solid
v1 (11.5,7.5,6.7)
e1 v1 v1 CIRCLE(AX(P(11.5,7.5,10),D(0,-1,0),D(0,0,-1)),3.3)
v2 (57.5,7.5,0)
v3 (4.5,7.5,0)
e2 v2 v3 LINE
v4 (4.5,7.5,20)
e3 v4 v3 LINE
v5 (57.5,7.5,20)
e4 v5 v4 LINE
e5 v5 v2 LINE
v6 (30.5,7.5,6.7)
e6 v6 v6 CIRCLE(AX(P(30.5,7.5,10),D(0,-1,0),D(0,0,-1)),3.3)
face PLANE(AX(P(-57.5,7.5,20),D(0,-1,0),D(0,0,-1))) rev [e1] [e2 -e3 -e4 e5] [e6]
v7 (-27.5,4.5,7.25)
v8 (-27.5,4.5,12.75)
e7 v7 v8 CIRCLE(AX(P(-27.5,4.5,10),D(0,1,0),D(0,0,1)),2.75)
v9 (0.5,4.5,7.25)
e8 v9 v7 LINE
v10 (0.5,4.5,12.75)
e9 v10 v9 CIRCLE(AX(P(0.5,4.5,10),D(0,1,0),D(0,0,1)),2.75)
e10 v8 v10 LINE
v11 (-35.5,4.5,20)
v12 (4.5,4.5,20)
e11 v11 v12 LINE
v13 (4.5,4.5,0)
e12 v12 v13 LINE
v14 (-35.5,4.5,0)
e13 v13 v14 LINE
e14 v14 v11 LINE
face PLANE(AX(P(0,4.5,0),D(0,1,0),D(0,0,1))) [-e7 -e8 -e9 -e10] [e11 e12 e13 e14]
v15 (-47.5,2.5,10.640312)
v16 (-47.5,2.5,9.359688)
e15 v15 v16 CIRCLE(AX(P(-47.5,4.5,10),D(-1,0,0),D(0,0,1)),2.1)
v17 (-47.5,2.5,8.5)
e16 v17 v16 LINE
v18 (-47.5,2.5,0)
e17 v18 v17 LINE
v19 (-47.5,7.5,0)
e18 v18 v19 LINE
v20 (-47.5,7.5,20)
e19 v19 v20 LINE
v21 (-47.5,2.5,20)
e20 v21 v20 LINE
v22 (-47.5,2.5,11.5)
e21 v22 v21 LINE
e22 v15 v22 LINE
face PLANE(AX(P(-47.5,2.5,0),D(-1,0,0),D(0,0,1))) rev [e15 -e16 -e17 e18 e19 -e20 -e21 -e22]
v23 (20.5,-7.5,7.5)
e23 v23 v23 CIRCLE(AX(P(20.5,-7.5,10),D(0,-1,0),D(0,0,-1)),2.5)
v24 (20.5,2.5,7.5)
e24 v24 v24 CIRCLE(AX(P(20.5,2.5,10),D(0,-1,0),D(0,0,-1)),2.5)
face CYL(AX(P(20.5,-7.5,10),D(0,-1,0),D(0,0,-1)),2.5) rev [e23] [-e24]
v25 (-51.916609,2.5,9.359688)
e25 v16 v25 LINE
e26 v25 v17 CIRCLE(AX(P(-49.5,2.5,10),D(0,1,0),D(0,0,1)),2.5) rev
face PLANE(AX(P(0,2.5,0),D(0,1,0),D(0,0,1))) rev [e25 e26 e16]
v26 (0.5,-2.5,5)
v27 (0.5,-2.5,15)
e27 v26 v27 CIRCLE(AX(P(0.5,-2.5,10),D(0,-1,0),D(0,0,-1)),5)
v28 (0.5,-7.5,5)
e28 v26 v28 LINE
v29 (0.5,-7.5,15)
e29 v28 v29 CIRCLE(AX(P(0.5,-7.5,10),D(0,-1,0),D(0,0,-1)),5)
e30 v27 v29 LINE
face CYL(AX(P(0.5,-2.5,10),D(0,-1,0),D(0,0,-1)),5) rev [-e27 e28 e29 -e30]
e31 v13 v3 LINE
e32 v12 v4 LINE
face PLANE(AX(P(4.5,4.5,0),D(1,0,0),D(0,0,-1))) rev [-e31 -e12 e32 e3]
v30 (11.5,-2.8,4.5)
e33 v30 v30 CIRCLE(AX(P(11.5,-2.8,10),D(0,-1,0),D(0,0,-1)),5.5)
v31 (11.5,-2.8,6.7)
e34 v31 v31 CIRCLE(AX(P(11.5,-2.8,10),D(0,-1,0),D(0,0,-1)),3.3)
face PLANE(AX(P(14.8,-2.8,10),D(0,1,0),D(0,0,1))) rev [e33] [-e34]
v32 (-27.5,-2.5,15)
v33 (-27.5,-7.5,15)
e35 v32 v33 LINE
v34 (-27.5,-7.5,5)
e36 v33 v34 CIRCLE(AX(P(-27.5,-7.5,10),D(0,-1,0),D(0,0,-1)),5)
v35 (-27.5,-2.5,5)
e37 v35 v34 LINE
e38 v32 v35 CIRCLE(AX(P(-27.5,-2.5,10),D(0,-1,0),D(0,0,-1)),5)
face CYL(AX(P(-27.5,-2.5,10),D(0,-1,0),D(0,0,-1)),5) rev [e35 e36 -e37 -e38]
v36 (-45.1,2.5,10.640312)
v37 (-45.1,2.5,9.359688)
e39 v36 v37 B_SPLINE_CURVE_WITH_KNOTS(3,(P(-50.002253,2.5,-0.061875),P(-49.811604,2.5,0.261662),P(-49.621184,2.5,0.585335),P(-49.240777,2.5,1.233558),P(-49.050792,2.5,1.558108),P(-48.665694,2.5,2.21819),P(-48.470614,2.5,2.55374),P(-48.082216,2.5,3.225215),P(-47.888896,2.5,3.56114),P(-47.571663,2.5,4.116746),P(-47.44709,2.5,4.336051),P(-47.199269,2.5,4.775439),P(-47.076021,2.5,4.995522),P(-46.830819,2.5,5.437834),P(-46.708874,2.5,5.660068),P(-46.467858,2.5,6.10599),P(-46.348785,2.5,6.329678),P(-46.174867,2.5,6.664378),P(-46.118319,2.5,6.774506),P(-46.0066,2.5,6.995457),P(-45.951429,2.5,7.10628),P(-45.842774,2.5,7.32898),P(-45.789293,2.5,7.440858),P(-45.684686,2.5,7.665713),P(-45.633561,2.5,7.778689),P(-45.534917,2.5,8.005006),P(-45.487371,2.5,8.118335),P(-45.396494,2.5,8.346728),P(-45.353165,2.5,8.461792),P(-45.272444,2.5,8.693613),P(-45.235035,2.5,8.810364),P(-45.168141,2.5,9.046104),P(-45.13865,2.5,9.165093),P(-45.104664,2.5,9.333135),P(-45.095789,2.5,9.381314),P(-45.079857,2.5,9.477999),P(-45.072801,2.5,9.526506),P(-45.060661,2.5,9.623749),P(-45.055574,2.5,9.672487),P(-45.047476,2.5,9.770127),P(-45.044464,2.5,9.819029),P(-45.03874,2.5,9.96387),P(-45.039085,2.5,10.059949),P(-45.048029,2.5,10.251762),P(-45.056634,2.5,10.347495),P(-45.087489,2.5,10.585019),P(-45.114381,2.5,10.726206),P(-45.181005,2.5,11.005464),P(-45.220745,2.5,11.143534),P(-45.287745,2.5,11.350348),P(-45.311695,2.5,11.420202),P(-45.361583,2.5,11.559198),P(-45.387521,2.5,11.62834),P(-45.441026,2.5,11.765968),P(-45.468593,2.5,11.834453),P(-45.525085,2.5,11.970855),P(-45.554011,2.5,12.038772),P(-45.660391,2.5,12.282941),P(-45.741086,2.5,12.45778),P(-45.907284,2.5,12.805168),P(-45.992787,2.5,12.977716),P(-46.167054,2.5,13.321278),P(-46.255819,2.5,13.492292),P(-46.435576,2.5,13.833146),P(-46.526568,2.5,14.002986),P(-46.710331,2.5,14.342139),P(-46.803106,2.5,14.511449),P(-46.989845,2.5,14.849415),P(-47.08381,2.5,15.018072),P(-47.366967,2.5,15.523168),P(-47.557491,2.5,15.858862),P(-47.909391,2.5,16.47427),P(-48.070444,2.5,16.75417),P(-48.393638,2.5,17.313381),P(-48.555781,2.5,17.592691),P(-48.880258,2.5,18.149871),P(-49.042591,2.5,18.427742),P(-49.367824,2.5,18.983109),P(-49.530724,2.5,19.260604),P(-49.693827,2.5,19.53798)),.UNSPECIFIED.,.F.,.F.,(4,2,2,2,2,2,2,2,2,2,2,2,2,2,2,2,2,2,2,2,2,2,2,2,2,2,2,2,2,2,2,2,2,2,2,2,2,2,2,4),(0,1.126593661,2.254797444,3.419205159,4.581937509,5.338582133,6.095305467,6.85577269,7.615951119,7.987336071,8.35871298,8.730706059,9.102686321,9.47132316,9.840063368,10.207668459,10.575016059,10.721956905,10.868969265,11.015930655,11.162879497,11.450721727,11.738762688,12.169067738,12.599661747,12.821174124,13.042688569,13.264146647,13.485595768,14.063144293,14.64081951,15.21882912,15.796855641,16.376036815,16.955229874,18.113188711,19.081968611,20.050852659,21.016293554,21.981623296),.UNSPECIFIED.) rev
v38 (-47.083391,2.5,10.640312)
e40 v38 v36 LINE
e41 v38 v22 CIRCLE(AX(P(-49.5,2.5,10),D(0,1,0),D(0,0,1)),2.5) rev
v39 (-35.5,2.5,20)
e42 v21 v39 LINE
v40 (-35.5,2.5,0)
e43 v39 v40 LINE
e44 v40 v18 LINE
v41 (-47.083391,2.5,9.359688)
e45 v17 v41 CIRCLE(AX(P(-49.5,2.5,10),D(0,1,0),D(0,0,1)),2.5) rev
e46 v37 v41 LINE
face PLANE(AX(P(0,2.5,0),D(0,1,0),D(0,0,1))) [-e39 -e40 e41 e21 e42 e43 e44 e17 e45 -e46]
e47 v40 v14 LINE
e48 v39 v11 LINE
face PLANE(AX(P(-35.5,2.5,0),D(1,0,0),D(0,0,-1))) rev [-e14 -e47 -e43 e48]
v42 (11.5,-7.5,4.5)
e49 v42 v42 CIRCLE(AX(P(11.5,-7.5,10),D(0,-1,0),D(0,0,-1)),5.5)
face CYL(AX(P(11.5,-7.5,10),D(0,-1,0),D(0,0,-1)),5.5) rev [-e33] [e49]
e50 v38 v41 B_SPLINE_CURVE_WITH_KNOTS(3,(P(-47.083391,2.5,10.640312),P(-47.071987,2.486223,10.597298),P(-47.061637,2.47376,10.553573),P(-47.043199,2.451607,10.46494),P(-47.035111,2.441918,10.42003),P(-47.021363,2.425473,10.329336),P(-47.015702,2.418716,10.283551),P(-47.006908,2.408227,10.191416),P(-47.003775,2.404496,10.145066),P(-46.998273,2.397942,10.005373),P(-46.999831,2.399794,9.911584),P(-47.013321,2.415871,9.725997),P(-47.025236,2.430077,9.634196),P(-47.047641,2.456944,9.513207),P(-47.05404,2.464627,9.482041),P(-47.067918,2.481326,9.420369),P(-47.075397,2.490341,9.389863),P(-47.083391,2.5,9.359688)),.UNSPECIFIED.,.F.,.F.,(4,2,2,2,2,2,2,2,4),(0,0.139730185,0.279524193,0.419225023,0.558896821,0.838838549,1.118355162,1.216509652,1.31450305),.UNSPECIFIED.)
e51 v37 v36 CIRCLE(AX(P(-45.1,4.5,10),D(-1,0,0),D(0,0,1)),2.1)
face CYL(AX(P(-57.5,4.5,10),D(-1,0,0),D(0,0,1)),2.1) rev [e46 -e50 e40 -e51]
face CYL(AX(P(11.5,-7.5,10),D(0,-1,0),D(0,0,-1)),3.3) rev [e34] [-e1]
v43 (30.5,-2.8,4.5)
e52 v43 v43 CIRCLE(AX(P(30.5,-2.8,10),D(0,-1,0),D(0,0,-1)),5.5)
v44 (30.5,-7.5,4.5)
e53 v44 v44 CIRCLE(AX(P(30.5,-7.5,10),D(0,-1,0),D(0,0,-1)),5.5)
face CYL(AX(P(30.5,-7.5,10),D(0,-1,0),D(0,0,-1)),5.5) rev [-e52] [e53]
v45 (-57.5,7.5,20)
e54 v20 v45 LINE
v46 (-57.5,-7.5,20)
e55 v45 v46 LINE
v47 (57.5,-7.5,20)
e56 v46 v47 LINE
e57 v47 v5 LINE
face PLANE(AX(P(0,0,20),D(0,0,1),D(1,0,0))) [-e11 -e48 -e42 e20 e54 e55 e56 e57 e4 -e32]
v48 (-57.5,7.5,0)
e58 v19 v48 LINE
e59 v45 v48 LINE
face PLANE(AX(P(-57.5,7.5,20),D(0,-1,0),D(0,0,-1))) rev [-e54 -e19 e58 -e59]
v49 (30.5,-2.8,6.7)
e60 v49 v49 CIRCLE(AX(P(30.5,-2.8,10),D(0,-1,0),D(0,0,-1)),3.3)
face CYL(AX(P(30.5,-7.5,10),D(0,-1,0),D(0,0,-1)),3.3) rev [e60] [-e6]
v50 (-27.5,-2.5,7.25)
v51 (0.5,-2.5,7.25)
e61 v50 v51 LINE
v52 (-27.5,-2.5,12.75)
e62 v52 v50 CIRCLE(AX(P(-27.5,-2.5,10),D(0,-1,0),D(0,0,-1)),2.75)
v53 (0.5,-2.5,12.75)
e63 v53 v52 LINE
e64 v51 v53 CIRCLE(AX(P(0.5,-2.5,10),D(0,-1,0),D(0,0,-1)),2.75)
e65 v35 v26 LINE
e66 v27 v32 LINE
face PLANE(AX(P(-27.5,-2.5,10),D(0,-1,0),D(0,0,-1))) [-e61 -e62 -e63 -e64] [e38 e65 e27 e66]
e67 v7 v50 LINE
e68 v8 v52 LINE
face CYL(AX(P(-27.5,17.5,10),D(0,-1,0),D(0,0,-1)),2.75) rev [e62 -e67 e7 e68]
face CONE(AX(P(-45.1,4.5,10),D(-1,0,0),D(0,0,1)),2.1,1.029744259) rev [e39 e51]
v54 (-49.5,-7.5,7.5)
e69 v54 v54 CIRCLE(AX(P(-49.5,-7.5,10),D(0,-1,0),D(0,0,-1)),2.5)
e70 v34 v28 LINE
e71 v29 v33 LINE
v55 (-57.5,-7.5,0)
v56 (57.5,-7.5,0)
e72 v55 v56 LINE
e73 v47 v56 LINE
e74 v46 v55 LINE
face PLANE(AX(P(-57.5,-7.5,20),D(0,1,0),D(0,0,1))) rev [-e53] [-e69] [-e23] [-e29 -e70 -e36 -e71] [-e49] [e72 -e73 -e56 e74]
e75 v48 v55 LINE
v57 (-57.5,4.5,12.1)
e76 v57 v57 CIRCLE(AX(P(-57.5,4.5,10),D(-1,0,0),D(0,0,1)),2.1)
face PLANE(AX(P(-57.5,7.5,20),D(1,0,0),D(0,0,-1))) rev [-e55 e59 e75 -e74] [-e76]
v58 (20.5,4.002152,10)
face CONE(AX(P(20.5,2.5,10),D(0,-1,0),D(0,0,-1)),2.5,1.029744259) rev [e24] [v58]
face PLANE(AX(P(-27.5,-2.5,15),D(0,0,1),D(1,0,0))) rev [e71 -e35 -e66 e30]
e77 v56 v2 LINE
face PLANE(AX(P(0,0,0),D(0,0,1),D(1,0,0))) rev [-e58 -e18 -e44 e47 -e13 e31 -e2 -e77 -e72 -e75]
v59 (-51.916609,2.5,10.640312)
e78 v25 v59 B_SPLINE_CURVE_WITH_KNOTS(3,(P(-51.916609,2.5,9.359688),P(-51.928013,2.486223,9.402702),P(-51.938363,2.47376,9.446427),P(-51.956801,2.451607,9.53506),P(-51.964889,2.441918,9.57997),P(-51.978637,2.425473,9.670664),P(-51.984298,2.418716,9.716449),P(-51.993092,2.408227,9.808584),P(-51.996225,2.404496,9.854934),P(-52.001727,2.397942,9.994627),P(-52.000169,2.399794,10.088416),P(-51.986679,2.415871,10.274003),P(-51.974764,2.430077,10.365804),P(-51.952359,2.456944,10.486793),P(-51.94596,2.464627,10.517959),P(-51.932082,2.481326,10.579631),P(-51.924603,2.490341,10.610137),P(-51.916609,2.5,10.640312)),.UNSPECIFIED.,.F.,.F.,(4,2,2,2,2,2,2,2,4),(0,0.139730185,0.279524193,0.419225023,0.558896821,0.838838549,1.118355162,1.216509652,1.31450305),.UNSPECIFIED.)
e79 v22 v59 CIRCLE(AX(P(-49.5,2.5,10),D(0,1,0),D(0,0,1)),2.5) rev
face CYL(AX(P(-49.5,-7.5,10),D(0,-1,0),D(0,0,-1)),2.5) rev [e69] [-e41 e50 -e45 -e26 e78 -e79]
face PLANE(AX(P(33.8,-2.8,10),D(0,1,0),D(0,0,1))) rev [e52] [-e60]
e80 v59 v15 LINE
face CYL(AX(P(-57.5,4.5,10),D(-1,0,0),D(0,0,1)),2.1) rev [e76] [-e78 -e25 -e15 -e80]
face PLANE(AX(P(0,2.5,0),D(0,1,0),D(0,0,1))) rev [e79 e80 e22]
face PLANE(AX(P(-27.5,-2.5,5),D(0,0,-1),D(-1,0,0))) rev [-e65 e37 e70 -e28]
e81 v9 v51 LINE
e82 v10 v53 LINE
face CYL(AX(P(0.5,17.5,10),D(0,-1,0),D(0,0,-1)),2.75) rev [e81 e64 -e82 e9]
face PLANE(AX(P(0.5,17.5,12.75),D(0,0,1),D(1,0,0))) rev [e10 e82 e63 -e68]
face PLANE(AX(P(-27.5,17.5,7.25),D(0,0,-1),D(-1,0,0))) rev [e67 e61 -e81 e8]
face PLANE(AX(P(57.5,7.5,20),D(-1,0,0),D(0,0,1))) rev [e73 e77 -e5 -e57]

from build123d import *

# Parameters (mm, degrees)
SKETCH_1_W                 = 115
SKETCH_1_H                 = 15
EXTRUDE_1_DEPTH            = 20
SKETCH_2_W                 = 12
SKETCH_2_H                 = 20
CUT_EXTRUDE_1_DEPTH        = 5
SKETCH_3_W                 = 40
SKETCH_3_H                 = 20
CUT_EXTRUDE_2_DEPTH        = 3
HOLE_START                 = -7.5
HOLE_WIZARD_M6_1_OUTLINE_R = 2.5
HOLE_WIZARD_M6_1_DEPTH     = 10
CUT_EXTRUDE_3_DEPTH        = 5
CUT_EXTRUDE_4_DEPTH        = 20
HOLE_WIZARD_3_D            = 6.6
HOLE_WIZARD_3_DEPTH        = 15
HOLE_WIZARD_3_CBORE_D      = 11
HOLE_WIZARD_3_CBORE_DEPTH  = 4.7
HOLE_WIZARD_3_TIP          = 1.982840043
HOLE_WIZARD_M5_1_D         = 4.2
HOLE_WIZARD_M5_1_DEPTH     = 12.4
HOLE_WIZARD_M5_1_TIP       = 1.2618073


# Read off the part's stored shape, not the designer's step: M6 螺纹孔1
with BuildPart() as part:
    # 草图1 → 凸台-拉伸1 (new body)
    with BuildSketch(Plane.XY):
        Rectangle(SKETCH_1_W, SKETCH_1_H)
    extrude(amount=EXTRUDE_1_DEPTH)

    # 草图2 → 切除-拉伸1 (cut)
    with BuildSketch(Plane(origin=(0, 7.5, 0), x_dir=(1, 0, 0), z_dir=(0, 1, 0))):
        with Locations((-41.5, -10)):
            Rectangle(SKETCH_2_W, SKETCH_2_H)
    extrude(amount=-CUT_EXTRUDE_1_DEPTH, mode=Mode.SUBTRACT)

    # 草图3 → 切除-拉伸2 (cut)
    with BuildSketch(Plane(origin=(0, 7.5, 0), x_dir=(1, 0, 0), z_dir=(0, 1, 0))):
        with Locations((-15.5, -10)):
            Rectangle(SKETCH_3_W, SKETCH_3_H)
    extrude(amount=-CUT_EXTRUDE_2_DEPTH, mode=Mode.SUBTRACT)

    # M6 螺纹孔1 outline → M6 螺纹孔1 (cut)
    with BuildSketch(Plane(origin=(0, 0, 0), x_dir=(1, 0, 0), z_dir=(0, 1, 0)).offset(HOLE_START)):
        with Locations((-49.5, -10)):
            Circle(HOLE_WIZARD_M6_1_OUTLINE_R)
    extrude(amount=HOLE_WIZARD_M6_1_DEPTH, mode=Mode.SUBTRACT)

    # Hole Wizard M6 _1 2 outline → Hole Wizard M6 _1 2 (revolve, cut)
    with BuildSketch(Plane(origin=(20.5, 0, 10), x_dir=(1, 0, 0), z_dir=(0, 0, 1))):
        Polygon((2.5, 2.5), (0, 4.002151548), (0, -7.5), (2.5, -7.5), align=None)
    revolve(axis=Axis((20.5, 0, 10), (0, 1, 0)), mode=Mode.SUBTRACT)

    # 草图6 → 切除-拉伸3 (cut)
    with BuildSketch(Plane.XZ.offset(7.5)):
        with BuildLine():
            Line((-27.5, 15), (0.5, 15))
            ThreePointArc((0.5, 15), (5.5, 10), (0.5, 5))
            Line((0.5, 5), (-27.5, 5))
            ThreePointArc((-27.5, 5), (-32.5, 10), (-27.5, 15))
        make_face()
    extrude(amount=-CUT_EXTRUDE_3_DEPTH, mode=Mode.SUBTRACT)

    # 草图7 → 切除-拉伸4 (cut)
    with BuildSketch(Plane.XZ.offset(2.5)):
        with BuildLine():
            Line((-27.5, 7.25), (0.5, 7.25))
            ThreePointArc((0.5, 7.25), (3.25, 10), (0.5, 12.75))
            Line((0.5, 12.75), (-27.5, 12.75))
            ThreePointArc((-27.5, 12.75), (-30.25, 10), (-27.5, 7.25))
        make_face()
    extrude(amount=-CUT_EXTRUDE_4_DEPTH, mode=Mode.SUBTRACT)

    # 打孔尺寸(%根据)内六角花形圆柱头螺钉3
    with Locations(Plane(origin=(11.5, -7.5, 10), x_dir=(0, 0, -1), z_dir=(0, -1, 0))):
        with Locations((0, 0), (0, 19)):
            CounterBoreHole(HOLE_WIZARD_3_D / 2, HOLE_WIZARD_3_CBORE_D / 2, HOLE_WIZARD_3_CBORE_DEPTH, depth=HOLE_WIZARD_3_DEPTH)
            with Locations((0, 0, -(HOLE_WIZARD_3_DEPTH + HOLE_WIZARD_3_TIP / 2))):  # 118° drill point
                Cone(0, HOLE_WIZARD_3_D / 2, HOLE_WIZARD_3_TIP, mode=Mode.SUBTRACT)

    # M5 螺纹孔1
    with Locations(Plane(origin=(-57.5, 4.5, 10), x_dir=(0, 0, -1), z_dir=(-1, 0, 0))):
        with Locations((0, 0)):
            Hole(HOLE_WIZARD_M5_1_D / 2, depth=HOLE_WIZARD_M5_1_DEPTH)
            with Locations((0, 0, -(HOLE_WIZARD_M5_1_DEPTH + HOLE_WIZARD_M5_1_TIP / 2))):  # 118° drill point
                Cone(0, HOLE_WIZARD_M5_1_D / 2, HOLE_WIZARD_M5_1_TIP, mode=Mode.SUBTRACT)


solid = part.part
